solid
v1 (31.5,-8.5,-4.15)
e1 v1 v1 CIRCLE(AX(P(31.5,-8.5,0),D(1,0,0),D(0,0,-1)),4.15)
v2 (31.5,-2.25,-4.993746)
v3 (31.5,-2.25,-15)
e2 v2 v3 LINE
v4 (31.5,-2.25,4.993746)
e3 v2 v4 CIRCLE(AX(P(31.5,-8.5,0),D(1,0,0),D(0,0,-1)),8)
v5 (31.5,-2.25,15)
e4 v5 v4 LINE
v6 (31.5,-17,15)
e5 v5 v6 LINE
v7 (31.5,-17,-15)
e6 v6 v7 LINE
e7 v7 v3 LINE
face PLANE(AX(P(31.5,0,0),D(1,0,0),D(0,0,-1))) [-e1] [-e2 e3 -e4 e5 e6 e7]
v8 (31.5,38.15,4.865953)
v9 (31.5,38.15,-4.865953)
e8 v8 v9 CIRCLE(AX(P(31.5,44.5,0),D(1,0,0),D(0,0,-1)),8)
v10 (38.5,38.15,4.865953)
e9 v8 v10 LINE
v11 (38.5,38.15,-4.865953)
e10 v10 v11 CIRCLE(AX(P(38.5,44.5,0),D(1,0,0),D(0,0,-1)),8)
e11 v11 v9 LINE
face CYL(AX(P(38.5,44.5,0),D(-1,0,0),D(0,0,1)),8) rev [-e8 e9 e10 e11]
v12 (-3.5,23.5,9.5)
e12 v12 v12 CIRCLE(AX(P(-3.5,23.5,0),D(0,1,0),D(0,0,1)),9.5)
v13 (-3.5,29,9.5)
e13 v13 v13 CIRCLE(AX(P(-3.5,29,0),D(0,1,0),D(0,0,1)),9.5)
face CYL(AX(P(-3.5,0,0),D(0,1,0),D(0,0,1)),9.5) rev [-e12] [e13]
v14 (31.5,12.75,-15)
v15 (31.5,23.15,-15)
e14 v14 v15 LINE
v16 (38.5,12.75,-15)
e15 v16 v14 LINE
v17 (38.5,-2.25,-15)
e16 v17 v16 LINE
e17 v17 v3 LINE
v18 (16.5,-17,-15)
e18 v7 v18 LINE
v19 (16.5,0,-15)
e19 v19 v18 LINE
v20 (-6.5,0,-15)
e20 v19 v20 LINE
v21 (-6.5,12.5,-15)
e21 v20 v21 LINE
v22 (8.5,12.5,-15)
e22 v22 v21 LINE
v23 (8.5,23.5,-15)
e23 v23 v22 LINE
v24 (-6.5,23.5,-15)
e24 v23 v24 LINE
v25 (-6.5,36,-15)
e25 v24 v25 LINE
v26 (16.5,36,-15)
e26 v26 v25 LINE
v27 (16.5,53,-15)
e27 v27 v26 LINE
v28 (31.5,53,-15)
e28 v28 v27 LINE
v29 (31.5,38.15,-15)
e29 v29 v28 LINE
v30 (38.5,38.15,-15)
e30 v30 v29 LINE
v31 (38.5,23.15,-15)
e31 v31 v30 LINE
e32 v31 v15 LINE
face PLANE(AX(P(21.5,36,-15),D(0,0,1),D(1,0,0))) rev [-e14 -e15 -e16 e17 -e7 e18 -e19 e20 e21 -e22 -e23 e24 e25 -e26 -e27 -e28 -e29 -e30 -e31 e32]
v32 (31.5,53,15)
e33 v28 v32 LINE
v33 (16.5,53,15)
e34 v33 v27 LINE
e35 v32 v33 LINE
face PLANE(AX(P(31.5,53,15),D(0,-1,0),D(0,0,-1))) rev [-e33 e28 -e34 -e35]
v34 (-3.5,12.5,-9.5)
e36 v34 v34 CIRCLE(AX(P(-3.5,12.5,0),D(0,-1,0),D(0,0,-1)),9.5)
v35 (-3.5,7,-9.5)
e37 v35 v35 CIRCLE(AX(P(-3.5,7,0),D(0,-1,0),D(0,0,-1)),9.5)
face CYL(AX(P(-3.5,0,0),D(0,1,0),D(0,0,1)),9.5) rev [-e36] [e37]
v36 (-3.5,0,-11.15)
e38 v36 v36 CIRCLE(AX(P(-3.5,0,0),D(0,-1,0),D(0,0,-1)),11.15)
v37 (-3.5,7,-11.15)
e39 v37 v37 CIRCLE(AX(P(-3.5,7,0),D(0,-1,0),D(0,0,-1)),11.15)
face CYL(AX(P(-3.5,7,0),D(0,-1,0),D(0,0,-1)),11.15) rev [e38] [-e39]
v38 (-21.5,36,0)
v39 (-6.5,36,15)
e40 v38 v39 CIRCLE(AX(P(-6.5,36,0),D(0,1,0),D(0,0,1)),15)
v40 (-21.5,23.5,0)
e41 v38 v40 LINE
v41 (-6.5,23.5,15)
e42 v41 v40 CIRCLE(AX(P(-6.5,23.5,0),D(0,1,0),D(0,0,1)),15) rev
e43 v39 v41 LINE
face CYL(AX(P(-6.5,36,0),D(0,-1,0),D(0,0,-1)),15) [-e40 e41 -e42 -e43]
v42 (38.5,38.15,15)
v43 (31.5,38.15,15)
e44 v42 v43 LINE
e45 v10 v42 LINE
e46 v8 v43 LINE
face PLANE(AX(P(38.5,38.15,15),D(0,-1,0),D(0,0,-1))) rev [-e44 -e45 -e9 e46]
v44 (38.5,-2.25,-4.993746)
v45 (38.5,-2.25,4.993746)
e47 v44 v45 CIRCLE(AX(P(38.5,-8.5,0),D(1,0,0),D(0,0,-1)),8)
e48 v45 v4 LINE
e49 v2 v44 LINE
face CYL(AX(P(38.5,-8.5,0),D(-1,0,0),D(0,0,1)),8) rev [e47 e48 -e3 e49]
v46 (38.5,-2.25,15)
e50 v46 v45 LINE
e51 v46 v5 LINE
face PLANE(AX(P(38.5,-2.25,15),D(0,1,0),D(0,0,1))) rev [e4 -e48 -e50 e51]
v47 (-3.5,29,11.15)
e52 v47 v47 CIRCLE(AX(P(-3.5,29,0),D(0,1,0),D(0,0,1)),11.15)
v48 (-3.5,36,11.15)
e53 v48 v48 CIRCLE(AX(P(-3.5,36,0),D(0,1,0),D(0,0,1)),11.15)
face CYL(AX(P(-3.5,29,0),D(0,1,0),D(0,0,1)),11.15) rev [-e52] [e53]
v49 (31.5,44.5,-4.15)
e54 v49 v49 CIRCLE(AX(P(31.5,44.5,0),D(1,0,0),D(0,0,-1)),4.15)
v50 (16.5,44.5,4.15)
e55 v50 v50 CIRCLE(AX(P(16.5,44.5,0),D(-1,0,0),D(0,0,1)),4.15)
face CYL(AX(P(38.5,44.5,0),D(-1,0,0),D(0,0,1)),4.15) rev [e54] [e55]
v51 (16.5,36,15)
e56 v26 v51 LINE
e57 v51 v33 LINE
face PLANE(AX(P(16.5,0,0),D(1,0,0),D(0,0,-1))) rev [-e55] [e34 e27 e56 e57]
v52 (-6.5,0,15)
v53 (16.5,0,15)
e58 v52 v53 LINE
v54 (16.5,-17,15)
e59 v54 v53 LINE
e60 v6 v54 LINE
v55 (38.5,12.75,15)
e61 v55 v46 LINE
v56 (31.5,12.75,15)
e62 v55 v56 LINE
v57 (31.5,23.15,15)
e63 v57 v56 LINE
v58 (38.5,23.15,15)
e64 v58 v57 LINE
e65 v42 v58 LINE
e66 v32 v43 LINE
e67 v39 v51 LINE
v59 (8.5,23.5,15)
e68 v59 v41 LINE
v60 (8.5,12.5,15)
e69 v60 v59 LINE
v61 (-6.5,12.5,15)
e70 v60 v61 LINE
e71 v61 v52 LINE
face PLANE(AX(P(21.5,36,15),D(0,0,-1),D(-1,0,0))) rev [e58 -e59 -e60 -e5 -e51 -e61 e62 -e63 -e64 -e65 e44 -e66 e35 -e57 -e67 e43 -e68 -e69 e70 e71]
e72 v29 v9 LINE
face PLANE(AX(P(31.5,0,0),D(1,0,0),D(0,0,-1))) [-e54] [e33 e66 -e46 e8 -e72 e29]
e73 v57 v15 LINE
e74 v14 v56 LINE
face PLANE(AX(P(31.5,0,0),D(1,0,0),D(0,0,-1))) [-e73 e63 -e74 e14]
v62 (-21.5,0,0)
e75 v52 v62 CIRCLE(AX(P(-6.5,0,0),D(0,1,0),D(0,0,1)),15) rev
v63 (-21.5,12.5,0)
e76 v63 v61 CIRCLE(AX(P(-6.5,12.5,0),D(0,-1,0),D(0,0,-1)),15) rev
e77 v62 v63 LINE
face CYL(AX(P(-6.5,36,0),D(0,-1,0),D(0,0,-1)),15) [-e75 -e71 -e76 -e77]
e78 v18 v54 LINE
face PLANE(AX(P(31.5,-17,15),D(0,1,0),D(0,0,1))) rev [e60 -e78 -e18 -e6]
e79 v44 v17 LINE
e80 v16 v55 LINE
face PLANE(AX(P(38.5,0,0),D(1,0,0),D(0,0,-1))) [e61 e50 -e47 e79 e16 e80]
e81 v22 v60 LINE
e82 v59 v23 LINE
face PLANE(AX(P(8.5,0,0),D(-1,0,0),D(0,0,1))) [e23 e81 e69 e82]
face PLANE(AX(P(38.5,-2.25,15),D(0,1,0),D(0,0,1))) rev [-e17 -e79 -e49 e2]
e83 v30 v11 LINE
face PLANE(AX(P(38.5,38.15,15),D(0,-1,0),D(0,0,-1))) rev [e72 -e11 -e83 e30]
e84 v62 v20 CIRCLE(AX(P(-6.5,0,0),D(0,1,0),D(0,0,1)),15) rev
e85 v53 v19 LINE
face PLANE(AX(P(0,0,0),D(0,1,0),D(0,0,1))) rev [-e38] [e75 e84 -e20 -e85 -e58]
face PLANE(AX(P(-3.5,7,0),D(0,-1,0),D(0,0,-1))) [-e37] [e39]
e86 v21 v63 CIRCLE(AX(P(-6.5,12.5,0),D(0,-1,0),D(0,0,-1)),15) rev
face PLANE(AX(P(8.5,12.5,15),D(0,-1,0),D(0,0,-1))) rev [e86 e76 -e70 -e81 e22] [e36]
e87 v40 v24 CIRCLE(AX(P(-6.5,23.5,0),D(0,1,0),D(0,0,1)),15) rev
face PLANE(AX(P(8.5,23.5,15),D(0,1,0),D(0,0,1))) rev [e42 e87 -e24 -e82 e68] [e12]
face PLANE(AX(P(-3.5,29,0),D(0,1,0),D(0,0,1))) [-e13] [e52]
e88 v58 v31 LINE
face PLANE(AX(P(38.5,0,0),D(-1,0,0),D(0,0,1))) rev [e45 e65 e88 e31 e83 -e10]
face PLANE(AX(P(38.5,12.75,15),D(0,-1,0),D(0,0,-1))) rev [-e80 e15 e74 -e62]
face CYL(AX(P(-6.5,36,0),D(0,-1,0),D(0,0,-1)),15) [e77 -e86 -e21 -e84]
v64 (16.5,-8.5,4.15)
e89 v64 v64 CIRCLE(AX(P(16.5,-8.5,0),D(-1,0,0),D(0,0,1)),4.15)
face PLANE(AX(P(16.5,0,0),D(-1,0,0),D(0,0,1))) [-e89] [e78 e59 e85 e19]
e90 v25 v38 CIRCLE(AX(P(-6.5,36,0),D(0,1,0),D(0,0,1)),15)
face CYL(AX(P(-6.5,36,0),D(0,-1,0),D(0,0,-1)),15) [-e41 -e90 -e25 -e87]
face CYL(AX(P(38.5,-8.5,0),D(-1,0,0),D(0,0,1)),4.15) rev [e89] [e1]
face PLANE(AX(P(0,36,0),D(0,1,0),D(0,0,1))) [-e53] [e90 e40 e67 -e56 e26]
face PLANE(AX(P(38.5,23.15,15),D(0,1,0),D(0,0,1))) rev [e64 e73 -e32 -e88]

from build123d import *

# Parameters (mm, degrees)
SKETCH1_W           = 43
SKETCH1_H           = 30
BOSS_EXTRUDE1_DEPTH = 36
SKETCH2_W           = 30
SKETCH2_H           = 11
CUT_EXTRUDE1_DEPTH  = 30
SKETCH3_R           = 11.15
CUT_EXTRUDE2_DEPTH  = 7
CUT_EXTRUDE3_START  = -7
SKETCH4_R           = 11.15
CUT_EXTRUDE3_DEPTH  = 7
SKETCH5_R           = 9.5
CUT_EXTRUDE4_DEPTH  = 40.092838219
FILLET2_R           = 15
SKETCH6_W           = 30
SKETCH6_H           = 70
BOSS_EXTRUDE2_DEPTH = 10
SKETCH7_W           = 30
SKETCH7_H           = 15
BOSS_EXTRUDE3_DEPTH = 7
SKETCH8_R           = 4.15
CUT_EXTRUDE5_DEPTH  = 70.878465925
SKETCH9_R           = 8
CUT_EXTRUDE6_DEPTH  = 77.439518575
BOSS_EXTRUDE4_START = 5
SKETCH10_W          = 30
SKETCH10_H          = 17
SKETCH10_R          = 4.15
BOSS_EXTRUDE4_DEPTH = 5


with BuildPart() as part:
    # Sketch1 → Boss-Extrude1 (new body)
    with BuildSketch(Plane(origin=(0, 0, 0), x_dir=(1, 0, 0), z_dir=(0, 1, 0))):
        Rectangle(SKETCH1_W, SKETCH1_H)
    extrude(amount=BOSS_EXTRUDE1_DEPTH)

    # Sketch2 → Cut-Extrude1 (cut)
    with BuildSketch(Plane.ZY.offset(21.5)):
        with Locations((0, 18)):
            Rectangle(SKETCH2_W, SKETCH2_H)
    extrude(amount=-CUT_EXTRUDE1_DEPTH, mode=Mode.SUBTRACT)

    # Sketch3 → Cut-Extrude2 (cut)
    with BuildSketch(Plane(origin=(0, 36, 0), x_dir=(1, 0, 0), z_dir=(0, 1, 0))):
        with Locations(Location((-3.5, 0, 0), (0, 0, 270))):
            Circle(SKETCH3_R)
    extrude(amount=-CUT_EXTRUDE2_DEPTH, mode=Mode.SUBTRACT)

    # Sketch4 → Cut-Extrude3 (cut)
    with BuildSketch(Plane.XZ.offset(CUT_EXTRUDE3_START)):
        with Locations(Location((-3.5, 0, 0), (0, 0, 90))):
            Circle(SKETCH4_R)
    extrude(amount=CUT_EXTRUDE3_DEPTH, mode=Mode.SUBTRACT)

    # Sketch5 → Cut-Extrude4 (cut, through all)
    with BuildSketch(Plane(origin=(0, 29, 0), x_dir=(1, 0, 0), z_dir=(0, 1, 0))):
        with Locations(Location((-3.5, 0, 0), (0, 0, 90))):
            Circle(SKETCH5_R)
    extrude(amount=-CUT_EXTRUDE4_DEPTH, mode=Mode.SUBTRACT)

    # Fillet2
    fillet2_edges = [part.edges().sort_by_distance(p)[0] for p in [
        (-21.5, 6.25, -15),
        (-21.5, 6.25, 15),
        (-21.5, 29.75, 15),
        (-21.5, 29.75, -15),
    ]]
    fillet(fillet2_edges, radius=FILLET2_R - 0.0001)  # a hair under: the kernel refuses the full size

    # Sketch6 → Boss-Extrude2 (add)
    with BuildSketch(Plane(origin=(21.5, 0, 0), x_dir=(0, 0, -1), z_dir=(1, 0, 0))):
        with Locations((0, 18)):
            Rectangle(SKETCH6_W, SKETCH6_H)
    extrude(amount=BOSS_EXTRUDE2_DEPTH)

    # Sketch7 → Boss-Extrude3 (add)
    with BuildSketch(Plane(origin=(31.5, 0, 0), x_dir=(0, 0, -1), z_dir=(1, 0, 0))):
        with Locations((0, 30.65)):
            Rectangle(SKETCH7_W, SKETCH7_H)
        with Locations((0, 5.25)):
            Rectangle(SKETCH7_W, SKETCH7_H)
    extrude(amount=BOSS_EXTRUDE3_DEPTH)

    # Sketch8 → Cut-Extrude5 (cut, through all)
    with BuildSketch(Plane.ZY.offset(-21.5)):
        with Locations((0, -8.5)):
            Circle(SKETCH8_R)
        with Locations((0, 44.5)):
            Circle(SKETCH8_R)
    extrude(amount=-CUT_EXTRUDE5_DEPTH, mode=Mode.SUBTRACT)

    # Sketch9 → Cut-Extrude6 (cut, through all)
    with BuildSketch(Plane(origin=(31.5, 0, 0), x_dir=(0, 0, -1), z_dir=(1, 0, 0))):
        with Locations((0, -8.5)):
            Circle(SKETCH9_R)
        with Locations((0, 44.5)):
            Circle(SKETCH9_R)
    extrude(amount=CUT_EXTRUDE6_DEPTH, mode=Mode.SUBTRACT)

    # Sketch10 → Boss-Extrude4 (add)
    # profile 1 of 2: a face of its own
    with BuildSketch(Plane.ZY.offset(-21.5).offset(BOSS_EXTRUDE4_START)):
        with Locations((0, -8.5)):
            Rectangle(SKETCH10_W, SKETCH10_H)
        with Locations((0, -8.5)):
            Circle(SKETCH10_R, mode=Mode.SUBTRACT)
    # profile 2 of 2: a face of its own
    with BuildSketch(Plane.ZY.offset(-21.5).offset(BOSS_EXTRUDE4_START)):
        with Locations((0, 44.5)):
            Rectangle(SKETCH10_W, SKETCH10_H)
        with Locations((0, 44.5)):
            Circle(SKETCH10_R, mode=Mode.SUBTRACT)
    extrude(amount=-BOSS_EXTRUDE4_DEPTH)


solid = part.part
